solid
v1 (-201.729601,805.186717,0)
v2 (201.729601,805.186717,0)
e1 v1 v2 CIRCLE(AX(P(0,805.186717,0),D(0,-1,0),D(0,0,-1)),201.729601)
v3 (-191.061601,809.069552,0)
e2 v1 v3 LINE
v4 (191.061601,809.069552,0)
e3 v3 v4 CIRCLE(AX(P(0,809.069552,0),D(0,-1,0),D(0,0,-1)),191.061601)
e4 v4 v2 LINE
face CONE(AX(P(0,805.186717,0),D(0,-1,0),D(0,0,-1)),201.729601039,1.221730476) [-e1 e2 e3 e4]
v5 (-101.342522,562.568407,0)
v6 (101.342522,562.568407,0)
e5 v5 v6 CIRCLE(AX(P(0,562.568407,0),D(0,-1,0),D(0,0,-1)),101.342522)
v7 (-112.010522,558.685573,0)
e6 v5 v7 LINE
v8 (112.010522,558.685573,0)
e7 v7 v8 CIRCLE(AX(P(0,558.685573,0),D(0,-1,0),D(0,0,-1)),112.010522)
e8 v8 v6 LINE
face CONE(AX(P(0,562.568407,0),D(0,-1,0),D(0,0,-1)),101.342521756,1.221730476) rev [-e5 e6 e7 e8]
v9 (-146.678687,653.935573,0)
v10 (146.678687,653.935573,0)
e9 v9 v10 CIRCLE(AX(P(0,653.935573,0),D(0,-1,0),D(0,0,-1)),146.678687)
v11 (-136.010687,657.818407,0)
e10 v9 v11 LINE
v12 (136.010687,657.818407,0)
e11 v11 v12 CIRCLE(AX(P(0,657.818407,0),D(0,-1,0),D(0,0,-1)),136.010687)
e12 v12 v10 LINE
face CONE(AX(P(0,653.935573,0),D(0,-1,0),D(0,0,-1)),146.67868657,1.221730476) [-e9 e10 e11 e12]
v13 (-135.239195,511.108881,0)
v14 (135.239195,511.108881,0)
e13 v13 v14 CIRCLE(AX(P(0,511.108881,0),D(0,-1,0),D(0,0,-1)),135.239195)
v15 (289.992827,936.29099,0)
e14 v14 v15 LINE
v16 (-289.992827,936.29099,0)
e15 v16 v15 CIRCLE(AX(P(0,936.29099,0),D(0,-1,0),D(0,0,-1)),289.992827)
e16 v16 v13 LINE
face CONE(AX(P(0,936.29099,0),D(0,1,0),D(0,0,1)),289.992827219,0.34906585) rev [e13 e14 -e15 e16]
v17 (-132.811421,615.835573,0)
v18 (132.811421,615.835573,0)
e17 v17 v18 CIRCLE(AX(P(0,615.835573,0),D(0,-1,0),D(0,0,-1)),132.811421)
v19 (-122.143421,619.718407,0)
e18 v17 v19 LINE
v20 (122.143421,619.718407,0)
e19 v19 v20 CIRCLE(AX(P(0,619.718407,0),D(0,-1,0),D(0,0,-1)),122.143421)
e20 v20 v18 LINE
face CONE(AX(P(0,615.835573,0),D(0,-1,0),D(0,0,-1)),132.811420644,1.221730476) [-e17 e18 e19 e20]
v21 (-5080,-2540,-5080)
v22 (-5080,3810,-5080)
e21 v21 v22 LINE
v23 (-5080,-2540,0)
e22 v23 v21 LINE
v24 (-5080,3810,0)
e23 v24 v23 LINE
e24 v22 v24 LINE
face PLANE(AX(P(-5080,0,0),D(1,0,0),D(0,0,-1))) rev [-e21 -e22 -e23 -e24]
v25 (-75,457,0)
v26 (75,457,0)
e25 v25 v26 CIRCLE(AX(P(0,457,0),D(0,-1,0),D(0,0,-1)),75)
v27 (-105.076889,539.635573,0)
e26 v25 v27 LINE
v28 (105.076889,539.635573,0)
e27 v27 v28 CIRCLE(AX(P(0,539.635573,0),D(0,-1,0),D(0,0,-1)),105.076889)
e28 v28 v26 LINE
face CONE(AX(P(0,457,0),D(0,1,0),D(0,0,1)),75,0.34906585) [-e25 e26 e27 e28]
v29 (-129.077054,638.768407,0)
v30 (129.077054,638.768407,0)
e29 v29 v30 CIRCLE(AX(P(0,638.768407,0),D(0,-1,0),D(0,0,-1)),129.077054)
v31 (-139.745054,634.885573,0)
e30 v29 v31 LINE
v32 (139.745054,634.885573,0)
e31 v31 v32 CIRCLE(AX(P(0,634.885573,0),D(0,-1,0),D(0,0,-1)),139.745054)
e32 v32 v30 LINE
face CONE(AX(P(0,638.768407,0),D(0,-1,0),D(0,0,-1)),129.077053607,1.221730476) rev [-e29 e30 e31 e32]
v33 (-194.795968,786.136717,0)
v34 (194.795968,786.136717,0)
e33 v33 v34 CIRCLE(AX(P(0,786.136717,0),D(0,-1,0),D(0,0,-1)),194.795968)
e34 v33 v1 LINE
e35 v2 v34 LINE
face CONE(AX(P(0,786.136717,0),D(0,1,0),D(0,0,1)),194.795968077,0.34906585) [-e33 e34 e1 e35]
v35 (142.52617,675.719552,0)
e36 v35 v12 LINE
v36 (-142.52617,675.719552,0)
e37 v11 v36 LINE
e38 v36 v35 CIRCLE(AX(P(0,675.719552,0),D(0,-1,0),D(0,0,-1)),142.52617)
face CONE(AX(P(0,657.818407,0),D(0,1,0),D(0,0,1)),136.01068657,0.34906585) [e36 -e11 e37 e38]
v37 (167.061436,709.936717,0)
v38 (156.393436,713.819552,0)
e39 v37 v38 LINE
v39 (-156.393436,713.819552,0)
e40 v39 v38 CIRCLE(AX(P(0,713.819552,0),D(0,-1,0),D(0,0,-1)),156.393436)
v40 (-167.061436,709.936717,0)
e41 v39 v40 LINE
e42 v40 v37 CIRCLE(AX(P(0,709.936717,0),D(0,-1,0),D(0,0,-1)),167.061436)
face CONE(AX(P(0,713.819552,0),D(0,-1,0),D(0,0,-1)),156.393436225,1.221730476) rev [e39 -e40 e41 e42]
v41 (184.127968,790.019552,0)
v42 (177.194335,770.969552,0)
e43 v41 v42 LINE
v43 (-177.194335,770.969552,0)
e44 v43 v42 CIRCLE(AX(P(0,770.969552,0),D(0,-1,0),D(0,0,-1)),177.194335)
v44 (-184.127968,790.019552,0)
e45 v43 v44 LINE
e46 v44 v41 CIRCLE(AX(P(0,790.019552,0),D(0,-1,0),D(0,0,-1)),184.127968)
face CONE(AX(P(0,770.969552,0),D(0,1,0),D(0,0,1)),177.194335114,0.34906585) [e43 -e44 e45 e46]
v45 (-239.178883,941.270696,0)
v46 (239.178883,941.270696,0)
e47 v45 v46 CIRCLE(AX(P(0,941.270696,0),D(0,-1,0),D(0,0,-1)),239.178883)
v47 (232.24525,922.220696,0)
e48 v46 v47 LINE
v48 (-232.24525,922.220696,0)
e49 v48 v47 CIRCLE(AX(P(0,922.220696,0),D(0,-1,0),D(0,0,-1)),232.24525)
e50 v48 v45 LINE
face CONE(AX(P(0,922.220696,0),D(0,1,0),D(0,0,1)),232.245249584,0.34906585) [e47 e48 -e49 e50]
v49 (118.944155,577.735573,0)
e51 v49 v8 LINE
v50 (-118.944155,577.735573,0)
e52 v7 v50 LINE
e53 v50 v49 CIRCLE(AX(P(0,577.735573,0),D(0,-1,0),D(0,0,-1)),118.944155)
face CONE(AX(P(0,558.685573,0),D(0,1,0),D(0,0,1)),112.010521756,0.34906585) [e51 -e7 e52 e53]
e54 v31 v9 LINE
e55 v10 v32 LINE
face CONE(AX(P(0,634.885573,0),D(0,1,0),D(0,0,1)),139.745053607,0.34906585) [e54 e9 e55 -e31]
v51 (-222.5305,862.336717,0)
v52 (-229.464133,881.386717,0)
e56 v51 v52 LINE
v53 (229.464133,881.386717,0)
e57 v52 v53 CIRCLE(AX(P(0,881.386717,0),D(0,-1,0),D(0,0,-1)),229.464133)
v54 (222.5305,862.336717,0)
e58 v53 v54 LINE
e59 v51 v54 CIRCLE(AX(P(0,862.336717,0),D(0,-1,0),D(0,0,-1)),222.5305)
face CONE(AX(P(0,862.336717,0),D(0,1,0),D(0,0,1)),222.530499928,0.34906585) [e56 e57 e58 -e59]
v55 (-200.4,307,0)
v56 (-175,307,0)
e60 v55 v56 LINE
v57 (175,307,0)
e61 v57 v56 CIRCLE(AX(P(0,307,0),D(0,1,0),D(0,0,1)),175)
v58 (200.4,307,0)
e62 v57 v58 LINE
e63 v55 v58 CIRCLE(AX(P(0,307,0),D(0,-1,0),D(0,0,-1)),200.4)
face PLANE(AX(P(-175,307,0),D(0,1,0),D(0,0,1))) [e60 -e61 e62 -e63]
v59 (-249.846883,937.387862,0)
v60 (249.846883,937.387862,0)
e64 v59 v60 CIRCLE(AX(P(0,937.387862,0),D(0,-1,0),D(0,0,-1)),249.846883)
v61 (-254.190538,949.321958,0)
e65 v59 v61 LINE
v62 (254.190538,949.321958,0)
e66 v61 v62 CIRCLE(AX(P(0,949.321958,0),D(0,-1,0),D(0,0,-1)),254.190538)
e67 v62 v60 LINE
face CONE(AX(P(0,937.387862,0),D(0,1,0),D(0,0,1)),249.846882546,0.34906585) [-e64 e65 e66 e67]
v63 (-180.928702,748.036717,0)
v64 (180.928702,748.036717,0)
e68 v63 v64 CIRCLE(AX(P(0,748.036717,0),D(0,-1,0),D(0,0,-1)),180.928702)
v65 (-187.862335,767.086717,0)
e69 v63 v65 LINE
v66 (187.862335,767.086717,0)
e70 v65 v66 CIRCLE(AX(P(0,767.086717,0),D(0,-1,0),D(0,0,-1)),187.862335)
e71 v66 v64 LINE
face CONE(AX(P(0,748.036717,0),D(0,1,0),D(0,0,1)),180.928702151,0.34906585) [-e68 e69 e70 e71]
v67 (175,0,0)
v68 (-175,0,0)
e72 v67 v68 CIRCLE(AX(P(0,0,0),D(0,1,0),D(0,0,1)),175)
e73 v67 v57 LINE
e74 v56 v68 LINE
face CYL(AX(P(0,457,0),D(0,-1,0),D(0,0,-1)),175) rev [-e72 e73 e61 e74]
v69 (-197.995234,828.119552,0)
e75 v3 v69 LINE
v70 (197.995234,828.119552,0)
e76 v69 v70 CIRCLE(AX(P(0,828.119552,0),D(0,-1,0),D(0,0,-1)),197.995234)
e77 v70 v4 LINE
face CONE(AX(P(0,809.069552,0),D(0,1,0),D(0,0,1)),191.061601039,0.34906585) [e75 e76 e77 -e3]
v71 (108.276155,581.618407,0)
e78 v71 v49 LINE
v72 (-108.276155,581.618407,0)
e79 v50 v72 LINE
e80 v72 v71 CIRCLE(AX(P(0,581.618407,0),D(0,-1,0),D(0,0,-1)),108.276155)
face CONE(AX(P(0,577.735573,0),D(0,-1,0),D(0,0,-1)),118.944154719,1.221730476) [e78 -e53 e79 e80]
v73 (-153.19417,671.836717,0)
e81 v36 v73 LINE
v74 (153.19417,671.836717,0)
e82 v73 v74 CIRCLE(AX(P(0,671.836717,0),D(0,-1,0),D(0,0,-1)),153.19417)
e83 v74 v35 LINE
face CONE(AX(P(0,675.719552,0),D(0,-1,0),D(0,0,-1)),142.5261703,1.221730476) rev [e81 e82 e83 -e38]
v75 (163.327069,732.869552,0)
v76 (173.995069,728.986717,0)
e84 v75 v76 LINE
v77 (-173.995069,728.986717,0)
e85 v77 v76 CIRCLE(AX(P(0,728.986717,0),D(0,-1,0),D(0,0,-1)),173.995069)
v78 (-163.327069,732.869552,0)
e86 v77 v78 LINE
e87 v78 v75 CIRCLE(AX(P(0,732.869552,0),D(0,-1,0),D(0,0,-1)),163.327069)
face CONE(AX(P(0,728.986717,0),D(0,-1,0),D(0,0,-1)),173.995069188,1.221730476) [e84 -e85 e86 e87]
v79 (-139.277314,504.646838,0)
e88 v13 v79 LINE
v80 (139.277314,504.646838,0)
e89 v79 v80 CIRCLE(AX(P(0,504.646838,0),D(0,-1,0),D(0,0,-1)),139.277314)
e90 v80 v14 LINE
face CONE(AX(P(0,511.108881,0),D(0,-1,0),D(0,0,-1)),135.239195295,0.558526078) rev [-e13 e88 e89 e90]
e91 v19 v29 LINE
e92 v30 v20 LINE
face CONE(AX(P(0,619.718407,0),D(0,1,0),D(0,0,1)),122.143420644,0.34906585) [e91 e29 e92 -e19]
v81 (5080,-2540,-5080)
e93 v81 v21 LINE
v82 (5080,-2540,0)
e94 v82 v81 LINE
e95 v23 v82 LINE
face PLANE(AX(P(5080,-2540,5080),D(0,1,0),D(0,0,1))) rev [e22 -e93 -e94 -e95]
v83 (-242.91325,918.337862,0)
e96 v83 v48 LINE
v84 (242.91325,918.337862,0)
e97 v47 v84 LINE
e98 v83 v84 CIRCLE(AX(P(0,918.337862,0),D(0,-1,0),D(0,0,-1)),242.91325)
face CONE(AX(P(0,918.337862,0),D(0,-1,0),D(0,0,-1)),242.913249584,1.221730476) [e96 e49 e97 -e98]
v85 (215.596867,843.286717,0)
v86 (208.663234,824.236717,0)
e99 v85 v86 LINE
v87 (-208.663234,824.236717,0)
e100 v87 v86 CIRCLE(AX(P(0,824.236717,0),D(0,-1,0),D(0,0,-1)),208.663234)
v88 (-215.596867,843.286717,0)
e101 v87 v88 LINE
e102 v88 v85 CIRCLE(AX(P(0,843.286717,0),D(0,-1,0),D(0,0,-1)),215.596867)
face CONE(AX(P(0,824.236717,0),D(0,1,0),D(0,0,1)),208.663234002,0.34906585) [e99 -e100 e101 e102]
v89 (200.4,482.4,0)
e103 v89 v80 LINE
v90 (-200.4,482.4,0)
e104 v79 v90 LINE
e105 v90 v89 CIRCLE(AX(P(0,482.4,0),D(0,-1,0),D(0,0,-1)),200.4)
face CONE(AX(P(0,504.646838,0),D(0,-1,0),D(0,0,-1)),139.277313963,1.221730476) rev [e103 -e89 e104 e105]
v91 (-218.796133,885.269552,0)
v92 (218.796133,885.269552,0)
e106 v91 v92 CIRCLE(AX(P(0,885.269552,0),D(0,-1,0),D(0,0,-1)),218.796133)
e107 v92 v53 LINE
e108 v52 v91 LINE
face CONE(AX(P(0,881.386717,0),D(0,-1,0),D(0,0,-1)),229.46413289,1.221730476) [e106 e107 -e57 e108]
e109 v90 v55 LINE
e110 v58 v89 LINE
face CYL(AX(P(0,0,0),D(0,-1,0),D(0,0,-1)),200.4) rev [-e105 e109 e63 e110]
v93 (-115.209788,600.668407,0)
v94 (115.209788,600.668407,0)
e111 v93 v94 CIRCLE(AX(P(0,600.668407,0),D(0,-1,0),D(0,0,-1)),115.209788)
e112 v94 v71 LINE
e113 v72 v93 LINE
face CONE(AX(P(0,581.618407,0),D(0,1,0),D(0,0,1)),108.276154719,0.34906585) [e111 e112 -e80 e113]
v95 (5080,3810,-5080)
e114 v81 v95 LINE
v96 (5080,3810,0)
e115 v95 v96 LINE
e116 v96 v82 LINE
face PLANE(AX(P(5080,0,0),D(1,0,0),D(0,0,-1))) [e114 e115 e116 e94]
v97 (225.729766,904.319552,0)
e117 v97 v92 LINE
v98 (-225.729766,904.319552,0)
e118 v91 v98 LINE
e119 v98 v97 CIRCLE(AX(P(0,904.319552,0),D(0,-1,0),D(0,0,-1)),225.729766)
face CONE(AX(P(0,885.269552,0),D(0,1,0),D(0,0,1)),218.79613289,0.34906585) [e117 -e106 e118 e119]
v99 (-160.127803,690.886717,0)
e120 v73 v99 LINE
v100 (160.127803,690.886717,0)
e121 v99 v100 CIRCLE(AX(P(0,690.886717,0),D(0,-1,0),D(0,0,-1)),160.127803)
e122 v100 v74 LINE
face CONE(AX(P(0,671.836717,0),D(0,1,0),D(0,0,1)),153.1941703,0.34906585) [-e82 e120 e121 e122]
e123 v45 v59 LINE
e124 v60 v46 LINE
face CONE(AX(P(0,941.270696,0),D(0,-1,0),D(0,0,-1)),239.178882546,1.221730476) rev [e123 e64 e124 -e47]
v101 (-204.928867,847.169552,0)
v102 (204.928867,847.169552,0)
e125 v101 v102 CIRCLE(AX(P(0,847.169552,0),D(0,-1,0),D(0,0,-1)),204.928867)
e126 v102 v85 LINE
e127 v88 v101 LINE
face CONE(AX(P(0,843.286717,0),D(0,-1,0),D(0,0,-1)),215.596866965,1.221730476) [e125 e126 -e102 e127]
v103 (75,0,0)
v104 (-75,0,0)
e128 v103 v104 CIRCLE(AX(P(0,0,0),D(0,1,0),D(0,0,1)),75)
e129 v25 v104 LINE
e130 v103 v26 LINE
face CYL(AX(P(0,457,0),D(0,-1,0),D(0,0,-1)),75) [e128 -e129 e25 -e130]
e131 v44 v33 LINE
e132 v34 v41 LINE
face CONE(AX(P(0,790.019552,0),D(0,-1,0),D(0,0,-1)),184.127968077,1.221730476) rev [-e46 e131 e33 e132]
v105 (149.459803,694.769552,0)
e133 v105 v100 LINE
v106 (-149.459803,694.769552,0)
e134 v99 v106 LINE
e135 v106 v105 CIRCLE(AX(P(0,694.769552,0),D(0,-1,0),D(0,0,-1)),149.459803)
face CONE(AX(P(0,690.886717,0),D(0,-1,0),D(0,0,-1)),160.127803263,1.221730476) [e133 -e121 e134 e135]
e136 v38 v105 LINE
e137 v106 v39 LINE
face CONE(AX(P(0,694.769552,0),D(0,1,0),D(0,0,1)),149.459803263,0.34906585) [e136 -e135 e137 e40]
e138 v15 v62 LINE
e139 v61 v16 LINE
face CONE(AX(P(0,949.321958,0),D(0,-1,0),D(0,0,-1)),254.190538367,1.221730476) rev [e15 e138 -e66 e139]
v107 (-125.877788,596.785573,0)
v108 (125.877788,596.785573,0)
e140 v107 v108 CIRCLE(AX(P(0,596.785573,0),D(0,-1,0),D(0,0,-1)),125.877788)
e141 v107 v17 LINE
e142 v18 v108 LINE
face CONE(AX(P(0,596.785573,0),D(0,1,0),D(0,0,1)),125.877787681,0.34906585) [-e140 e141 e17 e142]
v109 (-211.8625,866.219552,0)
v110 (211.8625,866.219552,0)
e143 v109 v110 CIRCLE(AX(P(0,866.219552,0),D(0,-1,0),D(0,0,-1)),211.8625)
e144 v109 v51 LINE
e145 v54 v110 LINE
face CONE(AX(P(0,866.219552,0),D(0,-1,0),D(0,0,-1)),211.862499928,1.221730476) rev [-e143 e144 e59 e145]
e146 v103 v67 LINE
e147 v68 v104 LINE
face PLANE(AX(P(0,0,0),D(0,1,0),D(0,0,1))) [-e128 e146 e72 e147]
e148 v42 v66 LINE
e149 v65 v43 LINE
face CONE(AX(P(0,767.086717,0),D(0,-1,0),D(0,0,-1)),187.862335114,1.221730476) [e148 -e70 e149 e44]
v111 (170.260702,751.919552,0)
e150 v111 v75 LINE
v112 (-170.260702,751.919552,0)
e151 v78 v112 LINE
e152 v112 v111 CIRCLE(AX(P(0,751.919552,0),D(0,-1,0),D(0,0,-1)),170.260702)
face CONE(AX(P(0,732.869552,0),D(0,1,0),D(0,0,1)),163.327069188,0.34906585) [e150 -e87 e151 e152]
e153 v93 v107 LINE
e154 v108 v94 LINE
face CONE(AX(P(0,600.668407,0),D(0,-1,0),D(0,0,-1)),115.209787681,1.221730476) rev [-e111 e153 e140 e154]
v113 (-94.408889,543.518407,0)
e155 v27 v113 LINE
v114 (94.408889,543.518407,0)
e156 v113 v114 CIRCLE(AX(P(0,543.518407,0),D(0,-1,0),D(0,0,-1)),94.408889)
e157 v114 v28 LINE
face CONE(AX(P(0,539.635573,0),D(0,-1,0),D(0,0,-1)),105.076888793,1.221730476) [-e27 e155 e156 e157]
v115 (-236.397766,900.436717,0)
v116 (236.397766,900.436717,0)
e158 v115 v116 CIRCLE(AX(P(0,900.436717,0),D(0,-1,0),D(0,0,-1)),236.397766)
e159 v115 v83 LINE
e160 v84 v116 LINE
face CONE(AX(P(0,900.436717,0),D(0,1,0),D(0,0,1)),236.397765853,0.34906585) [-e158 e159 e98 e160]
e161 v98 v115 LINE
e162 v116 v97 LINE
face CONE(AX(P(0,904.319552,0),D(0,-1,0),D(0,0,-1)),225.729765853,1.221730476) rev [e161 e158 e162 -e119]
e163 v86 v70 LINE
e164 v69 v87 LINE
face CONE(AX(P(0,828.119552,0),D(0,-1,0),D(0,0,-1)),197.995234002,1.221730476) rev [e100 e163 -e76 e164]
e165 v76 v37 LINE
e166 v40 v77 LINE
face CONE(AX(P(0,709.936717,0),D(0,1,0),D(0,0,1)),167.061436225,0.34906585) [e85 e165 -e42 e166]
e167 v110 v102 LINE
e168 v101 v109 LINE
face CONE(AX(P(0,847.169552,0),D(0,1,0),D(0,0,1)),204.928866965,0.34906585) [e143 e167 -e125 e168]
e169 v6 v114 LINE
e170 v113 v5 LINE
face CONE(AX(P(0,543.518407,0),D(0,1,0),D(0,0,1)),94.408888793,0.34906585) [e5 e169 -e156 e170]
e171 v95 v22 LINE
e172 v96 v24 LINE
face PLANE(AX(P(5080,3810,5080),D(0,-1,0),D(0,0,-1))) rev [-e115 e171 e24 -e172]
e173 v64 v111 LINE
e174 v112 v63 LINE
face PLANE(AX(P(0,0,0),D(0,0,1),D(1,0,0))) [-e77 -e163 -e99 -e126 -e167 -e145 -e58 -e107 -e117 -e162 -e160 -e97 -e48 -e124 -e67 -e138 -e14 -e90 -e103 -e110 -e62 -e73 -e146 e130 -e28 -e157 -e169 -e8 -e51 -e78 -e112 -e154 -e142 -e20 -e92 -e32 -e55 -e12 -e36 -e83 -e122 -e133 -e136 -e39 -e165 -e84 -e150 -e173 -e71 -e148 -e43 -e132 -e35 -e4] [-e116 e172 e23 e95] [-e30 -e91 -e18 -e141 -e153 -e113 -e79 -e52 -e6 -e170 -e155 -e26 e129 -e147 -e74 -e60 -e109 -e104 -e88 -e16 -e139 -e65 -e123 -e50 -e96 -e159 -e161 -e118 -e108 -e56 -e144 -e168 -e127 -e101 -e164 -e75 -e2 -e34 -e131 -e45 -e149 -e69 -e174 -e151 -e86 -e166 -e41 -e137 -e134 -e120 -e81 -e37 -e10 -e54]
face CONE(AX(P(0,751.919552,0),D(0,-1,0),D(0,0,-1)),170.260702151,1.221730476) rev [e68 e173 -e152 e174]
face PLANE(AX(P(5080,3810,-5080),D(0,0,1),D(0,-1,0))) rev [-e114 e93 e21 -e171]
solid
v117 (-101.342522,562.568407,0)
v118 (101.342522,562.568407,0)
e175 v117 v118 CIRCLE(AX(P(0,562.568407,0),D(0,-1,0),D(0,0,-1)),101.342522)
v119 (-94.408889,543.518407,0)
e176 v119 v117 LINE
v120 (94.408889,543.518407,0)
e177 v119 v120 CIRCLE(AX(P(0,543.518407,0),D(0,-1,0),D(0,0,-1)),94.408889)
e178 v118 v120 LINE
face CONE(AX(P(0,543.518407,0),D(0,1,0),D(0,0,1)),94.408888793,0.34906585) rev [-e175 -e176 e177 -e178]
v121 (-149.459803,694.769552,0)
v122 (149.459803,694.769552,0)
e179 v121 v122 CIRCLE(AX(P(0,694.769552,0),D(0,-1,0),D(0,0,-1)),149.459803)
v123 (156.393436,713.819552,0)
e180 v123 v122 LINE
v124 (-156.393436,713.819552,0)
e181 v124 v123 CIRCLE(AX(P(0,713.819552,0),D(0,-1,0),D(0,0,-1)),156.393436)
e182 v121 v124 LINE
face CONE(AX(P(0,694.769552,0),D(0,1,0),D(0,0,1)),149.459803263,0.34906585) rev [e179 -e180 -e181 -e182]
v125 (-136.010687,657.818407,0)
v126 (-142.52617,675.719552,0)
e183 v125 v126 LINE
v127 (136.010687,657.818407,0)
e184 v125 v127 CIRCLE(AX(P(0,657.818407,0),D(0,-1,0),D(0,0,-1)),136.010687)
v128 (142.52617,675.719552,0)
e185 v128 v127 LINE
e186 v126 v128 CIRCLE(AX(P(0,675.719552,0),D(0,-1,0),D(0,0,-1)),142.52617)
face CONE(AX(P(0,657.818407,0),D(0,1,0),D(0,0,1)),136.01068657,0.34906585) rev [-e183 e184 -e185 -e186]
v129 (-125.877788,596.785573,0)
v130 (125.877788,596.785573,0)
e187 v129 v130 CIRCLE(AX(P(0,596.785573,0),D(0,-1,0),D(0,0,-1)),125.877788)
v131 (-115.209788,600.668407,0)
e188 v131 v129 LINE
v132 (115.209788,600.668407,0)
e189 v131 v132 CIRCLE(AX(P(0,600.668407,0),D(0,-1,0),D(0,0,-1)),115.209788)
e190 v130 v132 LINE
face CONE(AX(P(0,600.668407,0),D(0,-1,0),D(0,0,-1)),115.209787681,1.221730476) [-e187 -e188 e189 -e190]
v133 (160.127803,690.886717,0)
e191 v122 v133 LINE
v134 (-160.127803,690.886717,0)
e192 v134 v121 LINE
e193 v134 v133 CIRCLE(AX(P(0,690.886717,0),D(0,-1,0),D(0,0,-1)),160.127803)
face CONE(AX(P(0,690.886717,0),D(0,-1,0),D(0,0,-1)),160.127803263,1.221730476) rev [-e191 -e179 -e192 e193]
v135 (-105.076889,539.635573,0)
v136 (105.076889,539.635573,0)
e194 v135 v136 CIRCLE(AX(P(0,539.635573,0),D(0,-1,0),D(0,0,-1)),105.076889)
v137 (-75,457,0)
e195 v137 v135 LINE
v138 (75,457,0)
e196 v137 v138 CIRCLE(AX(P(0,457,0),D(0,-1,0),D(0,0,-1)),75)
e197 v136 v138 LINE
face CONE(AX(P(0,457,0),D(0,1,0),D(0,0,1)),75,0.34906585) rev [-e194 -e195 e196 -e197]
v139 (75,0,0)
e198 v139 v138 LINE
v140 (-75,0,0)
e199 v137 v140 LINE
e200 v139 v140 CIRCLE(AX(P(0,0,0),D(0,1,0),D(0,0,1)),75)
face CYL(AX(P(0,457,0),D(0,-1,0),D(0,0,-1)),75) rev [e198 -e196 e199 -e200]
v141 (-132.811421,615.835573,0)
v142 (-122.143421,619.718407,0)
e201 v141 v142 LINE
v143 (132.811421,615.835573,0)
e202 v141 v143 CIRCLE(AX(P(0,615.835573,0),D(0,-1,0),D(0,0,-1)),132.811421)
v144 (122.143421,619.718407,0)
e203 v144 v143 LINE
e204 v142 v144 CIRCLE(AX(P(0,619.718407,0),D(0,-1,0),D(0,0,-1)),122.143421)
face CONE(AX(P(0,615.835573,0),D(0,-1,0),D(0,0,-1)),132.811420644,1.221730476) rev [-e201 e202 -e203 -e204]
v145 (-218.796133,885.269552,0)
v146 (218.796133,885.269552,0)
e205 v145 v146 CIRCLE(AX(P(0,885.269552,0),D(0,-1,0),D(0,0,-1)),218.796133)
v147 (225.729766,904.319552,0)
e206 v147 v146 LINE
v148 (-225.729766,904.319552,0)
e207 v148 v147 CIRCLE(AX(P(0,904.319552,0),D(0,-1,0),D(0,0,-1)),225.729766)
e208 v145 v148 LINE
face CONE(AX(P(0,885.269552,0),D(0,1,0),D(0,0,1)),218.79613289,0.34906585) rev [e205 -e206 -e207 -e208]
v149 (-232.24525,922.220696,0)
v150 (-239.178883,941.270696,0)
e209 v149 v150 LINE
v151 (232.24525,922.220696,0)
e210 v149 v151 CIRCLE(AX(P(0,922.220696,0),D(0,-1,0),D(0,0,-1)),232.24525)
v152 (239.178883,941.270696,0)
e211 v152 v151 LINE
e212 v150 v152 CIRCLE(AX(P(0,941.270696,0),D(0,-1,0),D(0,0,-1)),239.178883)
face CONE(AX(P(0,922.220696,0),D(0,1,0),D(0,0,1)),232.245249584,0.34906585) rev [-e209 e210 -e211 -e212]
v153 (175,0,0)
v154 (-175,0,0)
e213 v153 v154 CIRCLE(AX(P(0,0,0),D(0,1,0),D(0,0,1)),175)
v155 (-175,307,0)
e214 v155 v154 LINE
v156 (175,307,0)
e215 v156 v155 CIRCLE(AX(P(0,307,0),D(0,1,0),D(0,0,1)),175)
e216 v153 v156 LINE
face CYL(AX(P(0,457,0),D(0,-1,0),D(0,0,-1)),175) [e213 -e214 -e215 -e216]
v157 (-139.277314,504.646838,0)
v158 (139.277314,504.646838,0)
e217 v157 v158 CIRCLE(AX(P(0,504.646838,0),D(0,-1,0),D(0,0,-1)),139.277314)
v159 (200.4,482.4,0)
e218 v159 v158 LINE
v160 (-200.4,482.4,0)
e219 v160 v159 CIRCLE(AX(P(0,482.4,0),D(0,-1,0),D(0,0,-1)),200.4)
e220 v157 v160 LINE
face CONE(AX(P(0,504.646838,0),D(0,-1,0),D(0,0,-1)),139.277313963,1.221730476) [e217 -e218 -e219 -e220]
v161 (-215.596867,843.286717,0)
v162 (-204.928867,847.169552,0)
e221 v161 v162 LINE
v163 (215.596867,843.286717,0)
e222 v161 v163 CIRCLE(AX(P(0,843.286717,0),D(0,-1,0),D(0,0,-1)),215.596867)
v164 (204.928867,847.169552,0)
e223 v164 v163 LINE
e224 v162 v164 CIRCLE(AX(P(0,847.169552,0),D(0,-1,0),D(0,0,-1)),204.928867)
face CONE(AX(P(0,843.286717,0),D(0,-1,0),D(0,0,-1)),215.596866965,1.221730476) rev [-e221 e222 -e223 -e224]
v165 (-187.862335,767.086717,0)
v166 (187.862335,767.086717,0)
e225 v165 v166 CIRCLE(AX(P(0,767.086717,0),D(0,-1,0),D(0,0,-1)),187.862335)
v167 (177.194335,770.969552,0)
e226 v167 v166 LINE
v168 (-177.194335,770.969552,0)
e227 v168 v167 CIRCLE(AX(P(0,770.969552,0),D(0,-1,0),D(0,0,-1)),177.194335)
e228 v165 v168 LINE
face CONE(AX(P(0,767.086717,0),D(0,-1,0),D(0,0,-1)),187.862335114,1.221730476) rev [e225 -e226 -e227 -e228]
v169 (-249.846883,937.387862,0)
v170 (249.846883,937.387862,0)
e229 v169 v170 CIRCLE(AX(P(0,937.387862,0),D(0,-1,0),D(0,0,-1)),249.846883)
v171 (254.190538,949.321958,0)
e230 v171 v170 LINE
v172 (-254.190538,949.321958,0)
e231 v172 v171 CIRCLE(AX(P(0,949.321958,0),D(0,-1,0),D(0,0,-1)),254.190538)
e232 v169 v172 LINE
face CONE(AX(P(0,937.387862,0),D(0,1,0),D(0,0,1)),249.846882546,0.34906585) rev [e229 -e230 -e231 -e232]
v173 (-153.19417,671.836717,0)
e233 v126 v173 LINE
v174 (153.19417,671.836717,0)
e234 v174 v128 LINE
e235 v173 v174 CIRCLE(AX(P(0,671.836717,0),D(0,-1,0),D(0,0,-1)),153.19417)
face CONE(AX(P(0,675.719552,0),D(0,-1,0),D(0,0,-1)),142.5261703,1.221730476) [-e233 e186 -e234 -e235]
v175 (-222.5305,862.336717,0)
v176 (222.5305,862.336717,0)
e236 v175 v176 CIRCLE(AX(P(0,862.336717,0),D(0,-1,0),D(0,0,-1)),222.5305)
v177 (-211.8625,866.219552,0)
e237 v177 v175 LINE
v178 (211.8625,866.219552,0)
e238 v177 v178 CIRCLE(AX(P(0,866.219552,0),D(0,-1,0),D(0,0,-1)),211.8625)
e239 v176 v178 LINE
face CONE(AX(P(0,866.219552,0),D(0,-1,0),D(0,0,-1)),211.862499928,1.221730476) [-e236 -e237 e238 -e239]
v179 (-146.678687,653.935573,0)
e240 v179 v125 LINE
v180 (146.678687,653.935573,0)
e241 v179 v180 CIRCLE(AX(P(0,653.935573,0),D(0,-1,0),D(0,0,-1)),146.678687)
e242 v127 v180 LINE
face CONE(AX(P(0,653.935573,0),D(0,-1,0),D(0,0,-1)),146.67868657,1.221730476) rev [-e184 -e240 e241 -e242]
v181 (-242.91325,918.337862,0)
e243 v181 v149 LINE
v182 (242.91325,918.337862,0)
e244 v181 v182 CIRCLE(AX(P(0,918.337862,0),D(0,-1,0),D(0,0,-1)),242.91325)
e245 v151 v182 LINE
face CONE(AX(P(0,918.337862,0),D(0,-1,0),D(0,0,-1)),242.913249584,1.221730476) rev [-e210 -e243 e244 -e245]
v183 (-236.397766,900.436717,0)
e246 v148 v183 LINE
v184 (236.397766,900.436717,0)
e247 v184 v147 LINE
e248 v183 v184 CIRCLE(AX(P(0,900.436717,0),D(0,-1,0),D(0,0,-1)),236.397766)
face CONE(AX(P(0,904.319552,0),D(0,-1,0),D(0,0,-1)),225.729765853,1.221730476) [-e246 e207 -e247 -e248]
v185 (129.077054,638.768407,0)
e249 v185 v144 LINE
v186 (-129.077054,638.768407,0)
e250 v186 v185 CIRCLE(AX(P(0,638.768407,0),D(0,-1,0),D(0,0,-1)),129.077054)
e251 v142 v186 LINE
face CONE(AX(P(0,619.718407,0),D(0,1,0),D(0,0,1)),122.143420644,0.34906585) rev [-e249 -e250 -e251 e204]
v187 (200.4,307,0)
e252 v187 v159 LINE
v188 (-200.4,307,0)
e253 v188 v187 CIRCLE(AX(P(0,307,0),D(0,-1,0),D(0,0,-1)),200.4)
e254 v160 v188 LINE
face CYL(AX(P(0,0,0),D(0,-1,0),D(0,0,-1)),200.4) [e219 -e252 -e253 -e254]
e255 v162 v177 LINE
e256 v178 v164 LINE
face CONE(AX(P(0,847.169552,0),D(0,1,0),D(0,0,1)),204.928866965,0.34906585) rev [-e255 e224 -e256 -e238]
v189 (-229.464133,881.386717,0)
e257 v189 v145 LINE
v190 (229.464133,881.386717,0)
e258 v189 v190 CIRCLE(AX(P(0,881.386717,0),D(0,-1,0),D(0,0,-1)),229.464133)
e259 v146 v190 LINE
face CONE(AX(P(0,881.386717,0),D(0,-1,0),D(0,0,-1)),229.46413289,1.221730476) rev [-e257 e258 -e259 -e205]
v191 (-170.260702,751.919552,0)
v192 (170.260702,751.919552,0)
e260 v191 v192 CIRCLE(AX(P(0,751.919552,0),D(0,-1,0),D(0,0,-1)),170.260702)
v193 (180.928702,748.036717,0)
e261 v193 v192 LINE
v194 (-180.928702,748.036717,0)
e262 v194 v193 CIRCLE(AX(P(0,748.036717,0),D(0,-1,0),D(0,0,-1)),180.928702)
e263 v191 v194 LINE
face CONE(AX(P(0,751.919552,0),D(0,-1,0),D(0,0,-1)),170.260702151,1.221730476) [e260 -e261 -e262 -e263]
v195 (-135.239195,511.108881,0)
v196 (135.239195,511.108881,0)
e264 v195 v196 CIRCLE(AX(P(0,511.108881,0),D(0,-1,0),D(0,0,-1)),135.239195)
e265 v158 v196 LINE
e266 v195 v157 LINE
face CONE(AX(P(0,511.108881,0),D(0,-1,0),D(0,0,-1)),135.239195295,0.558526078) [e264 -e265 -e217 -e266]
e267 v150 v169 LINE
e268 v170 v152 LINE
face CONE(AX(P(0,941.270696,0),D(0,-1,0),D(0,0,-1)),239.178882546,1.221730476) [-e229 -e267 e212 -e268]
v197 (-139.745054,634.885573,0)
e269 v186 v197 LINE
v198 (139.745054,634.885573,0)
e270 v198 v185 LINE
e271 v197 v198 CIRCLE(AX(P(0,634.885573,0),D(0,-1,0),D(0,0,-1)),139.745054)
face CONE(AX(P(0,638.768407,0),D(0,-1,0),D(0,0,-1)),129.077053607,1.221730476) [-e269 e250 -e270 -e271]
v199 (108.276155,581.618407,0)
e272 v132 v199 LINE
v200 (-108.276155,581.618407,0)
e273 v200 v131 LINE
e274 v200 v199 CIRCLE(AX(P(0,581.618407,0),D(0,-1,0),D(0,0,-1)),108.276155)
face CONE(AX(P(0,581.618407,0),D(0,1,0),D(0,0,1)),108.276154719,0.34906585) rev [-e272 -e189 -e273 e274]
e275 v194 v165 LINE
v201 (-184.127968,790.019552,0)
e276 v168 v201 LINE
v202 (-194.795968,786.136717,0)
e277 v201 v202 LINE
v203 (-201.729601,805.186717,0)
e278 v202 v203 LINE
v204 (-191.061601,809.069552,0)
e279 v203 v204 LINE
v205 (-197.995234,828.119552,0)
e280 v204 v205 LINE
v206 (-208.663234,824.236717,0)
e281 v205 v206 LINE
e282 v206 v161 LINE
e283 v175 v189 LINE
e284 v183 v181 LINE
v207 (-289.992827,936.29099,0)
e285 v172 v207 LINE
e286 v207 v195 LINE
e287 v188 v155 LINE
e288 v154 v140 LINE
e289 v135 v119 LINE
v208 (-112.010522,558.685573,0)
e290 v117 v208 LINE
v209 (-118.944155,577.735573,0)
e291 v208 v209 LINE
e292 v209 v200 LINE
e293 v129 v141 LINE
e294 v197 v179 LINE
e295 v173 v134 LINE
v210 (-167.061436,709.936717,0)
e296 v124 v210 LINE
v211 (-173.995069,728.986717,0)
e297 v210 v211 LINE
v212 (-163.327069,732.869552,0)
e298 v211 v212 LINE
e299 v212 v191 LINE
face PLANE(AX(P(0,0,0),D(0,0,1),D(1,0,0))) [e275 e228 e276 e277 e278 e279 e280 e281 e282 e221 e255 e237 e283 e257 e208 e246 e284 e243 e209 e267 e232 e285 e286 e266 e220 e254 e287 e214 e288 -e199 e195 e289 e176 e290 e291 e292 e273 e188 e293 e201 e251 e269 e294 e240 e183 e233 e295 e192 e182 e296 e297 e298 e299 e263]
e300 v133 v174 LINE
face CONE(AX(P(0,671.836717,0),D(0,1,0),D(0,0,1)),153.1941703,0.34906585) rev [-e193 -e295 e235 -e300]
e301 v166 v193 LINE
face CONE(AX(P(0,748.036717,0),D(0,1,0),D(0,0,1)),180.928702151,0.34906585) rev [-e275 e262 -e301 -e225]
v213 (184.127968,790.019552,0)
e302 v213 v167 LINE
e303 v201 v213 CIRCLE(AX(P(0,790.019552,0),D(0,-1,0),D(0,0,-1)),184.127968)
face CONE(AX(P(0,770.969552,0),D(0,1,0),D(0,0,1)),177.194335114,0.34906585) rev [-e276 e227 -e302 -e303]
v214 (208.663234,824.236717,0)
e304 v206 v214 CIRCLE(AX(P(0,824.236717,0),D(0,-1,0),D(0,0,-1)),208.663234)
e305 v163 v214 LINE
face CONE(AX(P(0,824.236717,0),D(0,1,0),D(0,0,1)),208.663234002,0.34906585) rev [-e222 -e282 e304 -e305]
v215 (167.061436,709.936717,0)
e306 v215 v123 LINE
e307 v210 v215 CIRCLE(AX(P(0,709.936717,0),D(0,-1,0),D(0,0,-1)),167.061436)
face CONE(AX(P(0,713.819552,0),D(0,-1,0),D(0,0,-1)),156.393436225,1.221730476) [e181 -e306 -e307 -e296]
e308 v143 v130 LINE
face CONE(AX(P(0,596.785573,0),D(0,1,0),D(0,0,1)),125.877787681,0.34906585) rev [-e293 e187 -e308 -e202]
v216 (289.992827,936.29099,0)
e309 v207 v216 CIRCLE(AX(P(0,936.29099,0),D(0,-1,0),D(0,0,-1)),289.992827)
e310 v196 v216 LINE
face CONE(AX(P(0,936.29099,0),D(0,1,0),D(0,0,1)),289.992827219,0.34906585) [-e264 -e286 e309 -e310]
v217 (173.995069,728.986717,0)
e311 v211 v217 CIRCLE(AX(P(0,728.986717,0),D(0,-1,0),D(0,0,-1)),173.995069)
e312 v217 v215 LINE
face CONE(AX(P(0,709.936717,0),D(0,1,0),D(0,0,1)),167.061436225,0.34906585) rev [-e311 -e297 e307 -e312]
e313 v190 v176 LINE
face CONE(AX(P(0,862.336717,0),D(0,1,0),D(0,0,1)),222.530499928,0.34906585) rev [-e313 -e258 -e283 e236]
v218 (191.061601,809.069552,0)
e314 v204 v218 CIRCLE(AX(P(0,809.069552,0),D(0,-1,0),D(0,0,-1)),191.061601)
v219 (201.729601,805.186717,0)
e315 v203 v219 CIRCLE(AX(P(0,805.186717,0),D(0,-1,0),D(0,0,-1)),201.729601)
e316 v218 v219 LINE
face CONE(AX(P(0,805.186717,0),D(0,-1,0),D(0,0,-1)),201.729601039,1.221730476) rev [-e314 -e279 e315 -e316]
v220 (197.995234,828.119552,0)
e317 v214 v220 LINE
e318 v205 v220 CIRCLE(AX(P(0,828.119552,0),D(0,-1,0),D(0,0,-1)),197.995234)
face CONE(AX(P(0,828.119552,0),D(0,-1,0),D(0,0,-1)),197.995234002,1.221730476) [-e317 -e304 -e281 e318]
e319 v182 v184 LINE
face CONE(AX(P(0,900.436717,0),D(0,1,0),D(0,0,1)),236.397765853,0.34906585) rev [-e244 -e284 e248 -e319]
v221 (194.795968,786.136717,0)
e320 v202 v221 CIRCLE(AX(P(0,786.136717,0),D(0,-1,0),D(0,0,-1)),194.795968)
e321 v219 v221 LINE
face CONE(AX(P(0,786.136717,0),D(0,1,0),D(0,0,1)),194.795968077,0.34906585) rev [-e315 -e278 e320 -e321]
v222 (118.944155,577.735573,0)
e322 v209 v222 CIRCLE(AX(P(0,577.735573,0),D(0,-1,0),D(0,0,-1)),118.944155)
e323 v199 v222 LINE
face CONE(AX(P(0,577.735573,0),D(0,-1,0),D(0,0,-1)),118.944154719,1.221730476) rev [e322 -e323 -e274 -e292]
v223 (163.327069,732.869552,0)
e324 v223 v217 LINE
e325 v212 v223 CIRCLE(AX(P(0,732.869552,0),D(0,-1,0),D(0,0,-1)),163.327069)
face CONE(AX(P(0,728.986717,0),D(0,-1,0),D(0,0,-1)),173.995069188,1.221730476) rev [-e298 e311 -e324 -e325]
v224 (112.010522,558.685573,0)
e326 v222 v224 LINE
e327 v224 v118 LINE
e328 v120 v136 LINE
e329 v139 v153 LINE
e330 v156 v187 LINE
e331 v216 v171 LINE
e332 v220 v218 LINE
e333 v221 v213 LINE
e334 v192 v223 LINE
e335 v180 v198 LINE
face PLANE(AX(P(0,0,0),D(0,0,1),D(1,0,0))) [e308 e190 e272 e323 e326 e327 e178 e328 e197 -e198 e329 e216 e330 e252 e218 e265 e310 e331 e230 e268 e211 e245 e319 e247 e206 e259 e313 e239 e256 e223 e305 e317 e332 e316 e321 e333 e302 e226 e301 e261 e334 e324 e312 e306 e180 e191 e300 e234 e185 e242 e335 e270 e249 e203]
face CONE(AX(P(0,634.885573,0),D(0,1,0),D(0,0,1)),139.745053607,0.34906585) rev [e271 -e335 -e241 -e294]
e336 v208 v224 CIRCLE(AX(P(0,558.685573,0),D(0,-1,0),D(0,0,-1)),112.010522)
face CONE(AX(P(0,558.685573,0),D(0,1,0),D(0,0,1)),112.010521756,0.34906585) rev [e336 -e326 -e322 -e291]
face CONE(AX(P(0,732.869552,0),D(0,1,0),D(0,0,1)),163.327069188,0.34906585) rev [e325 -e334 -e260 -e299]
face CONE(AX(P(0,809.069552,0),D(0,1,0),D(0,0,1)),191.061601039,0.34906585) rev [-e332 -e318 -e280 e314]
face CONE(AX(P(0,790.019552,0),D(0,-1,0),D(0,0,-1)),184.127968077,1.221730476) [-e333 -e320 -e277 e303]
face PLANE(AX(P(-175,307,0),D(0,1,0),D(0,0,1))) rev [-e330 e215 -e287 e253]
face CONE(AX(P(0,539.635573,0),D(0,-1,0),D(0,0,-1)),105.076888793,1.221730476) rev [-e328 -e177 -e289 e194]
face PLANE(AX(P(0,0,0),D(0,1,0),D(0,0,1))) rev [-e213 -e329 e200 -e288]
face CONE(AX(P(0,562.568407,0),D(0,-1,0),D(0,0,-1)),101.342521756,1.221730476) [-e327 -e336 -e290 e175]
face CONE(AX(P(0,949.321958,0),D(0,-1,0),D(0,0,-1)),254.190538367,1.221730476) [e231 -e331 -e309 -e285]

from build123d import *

# Parameters (mm, degrees)
SKETCH1_R           = 175
SKETCH1_R_2         = 75
BOSS_EXTRUDE1_DEPTH = 457
SKETCH3_W           = 10160
SKETCH3_H           = 6350
BOSS_EXTRUDE2_DEPTH = 5080
SKETCH4_W           = 13475.768327993
SKETCH4_H           = 8367.586519284
CUT_EXTRUDE1_DEPTH  = 8132.96778154


# Read off the part's stored shape, not the designer's step: Intersect1
with BuildPart() as part:
    # Sketch1 → Boss-Extrude1 (new body)
    with BuildSketch(Plane(origin=(0, 0, 0), x_dir=(1, 0, 0), z_dir=(0, 1, 0))):
        with Locations(Location((0, 0, 0), (0, 0, 270))):
            Circle(SKETCH1_R)
        with Locations(Location((0, 0, 0), (0, 0, 270))):
            Circle(SKETCH1_R_2, mode=Mode.SUBTRACT)
    extrude(amount=BOSS_EXTRUDE1_DEPTH)

    # Sketch2 → Revolve1 (revolve)
    with BuildSketch(Plane.XY, mode=Mode.PRIVATE) as revolve1_sk:
        Polygon((-175, 307), (-200.4, 307), (-200.4, 482.4), (-139.277313963, 504.646838356), (-135.239195295, 511.108881193), (-289.992827219, 936.290990481), (-254.190538367, 949.321957942), (-249.846882546, 937.387861658), (-239.178882546, 941.270696117), (-232.245249584, 922.220696117), (-242.913249584, 918.337861658), (-236.397765853, 900.436717232), (-225.729765853, 904.319551691), (-218.79613289, 885.269551691), (-229.46413289, 881.386717232), (-222.530499928, 862.336717232), (-211.862499928, 866.219551691), (-204.928866965, 847.169551691), (-215.596866965, 843.286717232), (-208.663234002, 824.236717232), (-197.995234002, 828.119551691), (-191.061601039, 809.069551691), (-201.729601039, 805.186717232), (-194.795968077, 786.136717232), (-184.127968077, 790.019551691), (-177.194335114, 770.969551691), (-187.862335114, 767.086717232), (-180.928702151, 748.036717232), (-170.260702151, 751.919551691), (-163.327069188, 732.869551691), (-173.995069188, 728.986717232), (-167.061436225, 709.936717232), (-156.393436225, 713.819551691), (-149.459803263, 694.769551691), (-160.127803263, 690.886717232), (-153.1941703, 671.836717232), (-142.5261703, 675.719551691), (-136.01068657, 657.818407265), (-146.67868657, 653.935572806), (-139.745053607, 634.885572806), (-129.077053607, 638.768407265), (-122.143420644, 619.718407265), (-132.811420644, 615.835572806), (-125.877787681, 596.785572806), (-115.209787681, 600.668407265), (-108.276154719, 581.618407265), (-118.944154719, 577.735572806), (-112.010521756, 558.685572806), (-101.342521756, 562.568407265), (-94.408888793, 543.518407265), (-105.076888793, 539.635572806), (-101.061934921, 528.604577704), (-75, 457), (-175, 457), align=None)
    revolve(revolve1_sk.sketch.rotate(Axis((0, 0, 0), (0, 1, 0)), 270), axis=Axis((0, 0, 0), (0, 1, 0)))


with BuildPart() as body_2:
    # Sketch3 → Boss-Extrude2 (new, symmetric)
    with BuildSketch(Plane(origin=(0, 0, 0), x_dir=(0, 0, -1), z_dir=(1, 0, 0))):
        with Locations((0, 635)):
            Rectangle(SKETCH3_W, SKETCH3_H)
    extrude(amount=BOSS_EXTRUDE2_DEPTH, both=True)

    # Intersect1 outline → Intersect1 (revolve, cut)
    with BuildSketch(Plane.XY):
        Polygon((105.076888793, 539.635572806), (75, 457), (75, 0), (175, 0), (175, 307), (200.4, 307), (200.4, 482.4), (139.277313963, 504.646838356), (135.239195295, 511.108881193), (289.992827219, 936.290990481), (254.190538367, 949.321957942), (249.846882546, 937.387861658), (239.178882546, 941.270696117), (232.245249584, 922.220696117), (242.913249584, 918.337861658), (236.397765853, 900.436717232), (225.729765853, 904.319551691), (218.79613289, 885.269551691), (229.46413289, 881.386717232), (222.530499928, 862.336717232), (211.862499928, 866.219551691), (204.928866965, 847.169551691), (215.596866965, 843.286717232), (208.663234002, 824.236717232), (197.995234002, 828.119551691), (191.061601039, 809.069551691), (201.729601039, 805.186717232), (194.795968077, 786.136717232), (184.127968077, 790.019551691), (177.194335114, 770.969551691), (187.862335114, 767.086717232), (180.928702151, 748.036717232), (170.260702151, 751.919551691), (163.327069188, 732.869551691), (173.995069188, 728.986717232), (167.061436225, 709.936717232), (156.393436225, 713.819551691), (149.459803263, 694.769551691), (160.127803263, 690.886717232), (153.1941703, 671.836717232), (142.5261703, 675.719551691), (136.01068657, 657.818407265), (146.67868657, 653.935572806), (139.745053607, 634.885572806), (129.077053607, 638.768407265), (122.143420644, 619.718407265), (132.811420644, 615.835572806), (125.877787681, 596.785572806), (115.209787681, 600.668407265), (108.276154719, 581.618407265), (118.944154719, 577.735572806), (112.010521756, 558.685572806), (101.342521756, 562.568407265), (94.408888793, 543.518407265), align=None)
    revolve(axis=Axis((0, 0, 0), (0, 1, 0)), mode=Mode.SUBTRACT)


with BuildPart() as cut_extrude1_tool:
    # Sketch4 → Cut-Extrude1 (new, through all)
    with BuildSketch(Plane.XY):
        with Locations((454.179344916, 464.014834855)):
            Rectangle(SKETCH4_W, SKETCH4_H)
    extrude(amount=CUT_EXTRUDE1_DEPTH)


with BuildPart() as part_1:
    add(part.part)

    # Cut-Extrude1: cut by cut_extrude1_tool
    add(cut_extrude1_tool.part, mode=Mode.SUBTRACT)


with BuildPart() as body_2_1:
    add(body_2.part)

    # Cut-Extrude1: cut by cut_extrude1_tool
    add(cut_extrude1_tool.part, mode=Mode.SUBTRACT)


solid = Compound([part_1.part, body_2_1.part])
